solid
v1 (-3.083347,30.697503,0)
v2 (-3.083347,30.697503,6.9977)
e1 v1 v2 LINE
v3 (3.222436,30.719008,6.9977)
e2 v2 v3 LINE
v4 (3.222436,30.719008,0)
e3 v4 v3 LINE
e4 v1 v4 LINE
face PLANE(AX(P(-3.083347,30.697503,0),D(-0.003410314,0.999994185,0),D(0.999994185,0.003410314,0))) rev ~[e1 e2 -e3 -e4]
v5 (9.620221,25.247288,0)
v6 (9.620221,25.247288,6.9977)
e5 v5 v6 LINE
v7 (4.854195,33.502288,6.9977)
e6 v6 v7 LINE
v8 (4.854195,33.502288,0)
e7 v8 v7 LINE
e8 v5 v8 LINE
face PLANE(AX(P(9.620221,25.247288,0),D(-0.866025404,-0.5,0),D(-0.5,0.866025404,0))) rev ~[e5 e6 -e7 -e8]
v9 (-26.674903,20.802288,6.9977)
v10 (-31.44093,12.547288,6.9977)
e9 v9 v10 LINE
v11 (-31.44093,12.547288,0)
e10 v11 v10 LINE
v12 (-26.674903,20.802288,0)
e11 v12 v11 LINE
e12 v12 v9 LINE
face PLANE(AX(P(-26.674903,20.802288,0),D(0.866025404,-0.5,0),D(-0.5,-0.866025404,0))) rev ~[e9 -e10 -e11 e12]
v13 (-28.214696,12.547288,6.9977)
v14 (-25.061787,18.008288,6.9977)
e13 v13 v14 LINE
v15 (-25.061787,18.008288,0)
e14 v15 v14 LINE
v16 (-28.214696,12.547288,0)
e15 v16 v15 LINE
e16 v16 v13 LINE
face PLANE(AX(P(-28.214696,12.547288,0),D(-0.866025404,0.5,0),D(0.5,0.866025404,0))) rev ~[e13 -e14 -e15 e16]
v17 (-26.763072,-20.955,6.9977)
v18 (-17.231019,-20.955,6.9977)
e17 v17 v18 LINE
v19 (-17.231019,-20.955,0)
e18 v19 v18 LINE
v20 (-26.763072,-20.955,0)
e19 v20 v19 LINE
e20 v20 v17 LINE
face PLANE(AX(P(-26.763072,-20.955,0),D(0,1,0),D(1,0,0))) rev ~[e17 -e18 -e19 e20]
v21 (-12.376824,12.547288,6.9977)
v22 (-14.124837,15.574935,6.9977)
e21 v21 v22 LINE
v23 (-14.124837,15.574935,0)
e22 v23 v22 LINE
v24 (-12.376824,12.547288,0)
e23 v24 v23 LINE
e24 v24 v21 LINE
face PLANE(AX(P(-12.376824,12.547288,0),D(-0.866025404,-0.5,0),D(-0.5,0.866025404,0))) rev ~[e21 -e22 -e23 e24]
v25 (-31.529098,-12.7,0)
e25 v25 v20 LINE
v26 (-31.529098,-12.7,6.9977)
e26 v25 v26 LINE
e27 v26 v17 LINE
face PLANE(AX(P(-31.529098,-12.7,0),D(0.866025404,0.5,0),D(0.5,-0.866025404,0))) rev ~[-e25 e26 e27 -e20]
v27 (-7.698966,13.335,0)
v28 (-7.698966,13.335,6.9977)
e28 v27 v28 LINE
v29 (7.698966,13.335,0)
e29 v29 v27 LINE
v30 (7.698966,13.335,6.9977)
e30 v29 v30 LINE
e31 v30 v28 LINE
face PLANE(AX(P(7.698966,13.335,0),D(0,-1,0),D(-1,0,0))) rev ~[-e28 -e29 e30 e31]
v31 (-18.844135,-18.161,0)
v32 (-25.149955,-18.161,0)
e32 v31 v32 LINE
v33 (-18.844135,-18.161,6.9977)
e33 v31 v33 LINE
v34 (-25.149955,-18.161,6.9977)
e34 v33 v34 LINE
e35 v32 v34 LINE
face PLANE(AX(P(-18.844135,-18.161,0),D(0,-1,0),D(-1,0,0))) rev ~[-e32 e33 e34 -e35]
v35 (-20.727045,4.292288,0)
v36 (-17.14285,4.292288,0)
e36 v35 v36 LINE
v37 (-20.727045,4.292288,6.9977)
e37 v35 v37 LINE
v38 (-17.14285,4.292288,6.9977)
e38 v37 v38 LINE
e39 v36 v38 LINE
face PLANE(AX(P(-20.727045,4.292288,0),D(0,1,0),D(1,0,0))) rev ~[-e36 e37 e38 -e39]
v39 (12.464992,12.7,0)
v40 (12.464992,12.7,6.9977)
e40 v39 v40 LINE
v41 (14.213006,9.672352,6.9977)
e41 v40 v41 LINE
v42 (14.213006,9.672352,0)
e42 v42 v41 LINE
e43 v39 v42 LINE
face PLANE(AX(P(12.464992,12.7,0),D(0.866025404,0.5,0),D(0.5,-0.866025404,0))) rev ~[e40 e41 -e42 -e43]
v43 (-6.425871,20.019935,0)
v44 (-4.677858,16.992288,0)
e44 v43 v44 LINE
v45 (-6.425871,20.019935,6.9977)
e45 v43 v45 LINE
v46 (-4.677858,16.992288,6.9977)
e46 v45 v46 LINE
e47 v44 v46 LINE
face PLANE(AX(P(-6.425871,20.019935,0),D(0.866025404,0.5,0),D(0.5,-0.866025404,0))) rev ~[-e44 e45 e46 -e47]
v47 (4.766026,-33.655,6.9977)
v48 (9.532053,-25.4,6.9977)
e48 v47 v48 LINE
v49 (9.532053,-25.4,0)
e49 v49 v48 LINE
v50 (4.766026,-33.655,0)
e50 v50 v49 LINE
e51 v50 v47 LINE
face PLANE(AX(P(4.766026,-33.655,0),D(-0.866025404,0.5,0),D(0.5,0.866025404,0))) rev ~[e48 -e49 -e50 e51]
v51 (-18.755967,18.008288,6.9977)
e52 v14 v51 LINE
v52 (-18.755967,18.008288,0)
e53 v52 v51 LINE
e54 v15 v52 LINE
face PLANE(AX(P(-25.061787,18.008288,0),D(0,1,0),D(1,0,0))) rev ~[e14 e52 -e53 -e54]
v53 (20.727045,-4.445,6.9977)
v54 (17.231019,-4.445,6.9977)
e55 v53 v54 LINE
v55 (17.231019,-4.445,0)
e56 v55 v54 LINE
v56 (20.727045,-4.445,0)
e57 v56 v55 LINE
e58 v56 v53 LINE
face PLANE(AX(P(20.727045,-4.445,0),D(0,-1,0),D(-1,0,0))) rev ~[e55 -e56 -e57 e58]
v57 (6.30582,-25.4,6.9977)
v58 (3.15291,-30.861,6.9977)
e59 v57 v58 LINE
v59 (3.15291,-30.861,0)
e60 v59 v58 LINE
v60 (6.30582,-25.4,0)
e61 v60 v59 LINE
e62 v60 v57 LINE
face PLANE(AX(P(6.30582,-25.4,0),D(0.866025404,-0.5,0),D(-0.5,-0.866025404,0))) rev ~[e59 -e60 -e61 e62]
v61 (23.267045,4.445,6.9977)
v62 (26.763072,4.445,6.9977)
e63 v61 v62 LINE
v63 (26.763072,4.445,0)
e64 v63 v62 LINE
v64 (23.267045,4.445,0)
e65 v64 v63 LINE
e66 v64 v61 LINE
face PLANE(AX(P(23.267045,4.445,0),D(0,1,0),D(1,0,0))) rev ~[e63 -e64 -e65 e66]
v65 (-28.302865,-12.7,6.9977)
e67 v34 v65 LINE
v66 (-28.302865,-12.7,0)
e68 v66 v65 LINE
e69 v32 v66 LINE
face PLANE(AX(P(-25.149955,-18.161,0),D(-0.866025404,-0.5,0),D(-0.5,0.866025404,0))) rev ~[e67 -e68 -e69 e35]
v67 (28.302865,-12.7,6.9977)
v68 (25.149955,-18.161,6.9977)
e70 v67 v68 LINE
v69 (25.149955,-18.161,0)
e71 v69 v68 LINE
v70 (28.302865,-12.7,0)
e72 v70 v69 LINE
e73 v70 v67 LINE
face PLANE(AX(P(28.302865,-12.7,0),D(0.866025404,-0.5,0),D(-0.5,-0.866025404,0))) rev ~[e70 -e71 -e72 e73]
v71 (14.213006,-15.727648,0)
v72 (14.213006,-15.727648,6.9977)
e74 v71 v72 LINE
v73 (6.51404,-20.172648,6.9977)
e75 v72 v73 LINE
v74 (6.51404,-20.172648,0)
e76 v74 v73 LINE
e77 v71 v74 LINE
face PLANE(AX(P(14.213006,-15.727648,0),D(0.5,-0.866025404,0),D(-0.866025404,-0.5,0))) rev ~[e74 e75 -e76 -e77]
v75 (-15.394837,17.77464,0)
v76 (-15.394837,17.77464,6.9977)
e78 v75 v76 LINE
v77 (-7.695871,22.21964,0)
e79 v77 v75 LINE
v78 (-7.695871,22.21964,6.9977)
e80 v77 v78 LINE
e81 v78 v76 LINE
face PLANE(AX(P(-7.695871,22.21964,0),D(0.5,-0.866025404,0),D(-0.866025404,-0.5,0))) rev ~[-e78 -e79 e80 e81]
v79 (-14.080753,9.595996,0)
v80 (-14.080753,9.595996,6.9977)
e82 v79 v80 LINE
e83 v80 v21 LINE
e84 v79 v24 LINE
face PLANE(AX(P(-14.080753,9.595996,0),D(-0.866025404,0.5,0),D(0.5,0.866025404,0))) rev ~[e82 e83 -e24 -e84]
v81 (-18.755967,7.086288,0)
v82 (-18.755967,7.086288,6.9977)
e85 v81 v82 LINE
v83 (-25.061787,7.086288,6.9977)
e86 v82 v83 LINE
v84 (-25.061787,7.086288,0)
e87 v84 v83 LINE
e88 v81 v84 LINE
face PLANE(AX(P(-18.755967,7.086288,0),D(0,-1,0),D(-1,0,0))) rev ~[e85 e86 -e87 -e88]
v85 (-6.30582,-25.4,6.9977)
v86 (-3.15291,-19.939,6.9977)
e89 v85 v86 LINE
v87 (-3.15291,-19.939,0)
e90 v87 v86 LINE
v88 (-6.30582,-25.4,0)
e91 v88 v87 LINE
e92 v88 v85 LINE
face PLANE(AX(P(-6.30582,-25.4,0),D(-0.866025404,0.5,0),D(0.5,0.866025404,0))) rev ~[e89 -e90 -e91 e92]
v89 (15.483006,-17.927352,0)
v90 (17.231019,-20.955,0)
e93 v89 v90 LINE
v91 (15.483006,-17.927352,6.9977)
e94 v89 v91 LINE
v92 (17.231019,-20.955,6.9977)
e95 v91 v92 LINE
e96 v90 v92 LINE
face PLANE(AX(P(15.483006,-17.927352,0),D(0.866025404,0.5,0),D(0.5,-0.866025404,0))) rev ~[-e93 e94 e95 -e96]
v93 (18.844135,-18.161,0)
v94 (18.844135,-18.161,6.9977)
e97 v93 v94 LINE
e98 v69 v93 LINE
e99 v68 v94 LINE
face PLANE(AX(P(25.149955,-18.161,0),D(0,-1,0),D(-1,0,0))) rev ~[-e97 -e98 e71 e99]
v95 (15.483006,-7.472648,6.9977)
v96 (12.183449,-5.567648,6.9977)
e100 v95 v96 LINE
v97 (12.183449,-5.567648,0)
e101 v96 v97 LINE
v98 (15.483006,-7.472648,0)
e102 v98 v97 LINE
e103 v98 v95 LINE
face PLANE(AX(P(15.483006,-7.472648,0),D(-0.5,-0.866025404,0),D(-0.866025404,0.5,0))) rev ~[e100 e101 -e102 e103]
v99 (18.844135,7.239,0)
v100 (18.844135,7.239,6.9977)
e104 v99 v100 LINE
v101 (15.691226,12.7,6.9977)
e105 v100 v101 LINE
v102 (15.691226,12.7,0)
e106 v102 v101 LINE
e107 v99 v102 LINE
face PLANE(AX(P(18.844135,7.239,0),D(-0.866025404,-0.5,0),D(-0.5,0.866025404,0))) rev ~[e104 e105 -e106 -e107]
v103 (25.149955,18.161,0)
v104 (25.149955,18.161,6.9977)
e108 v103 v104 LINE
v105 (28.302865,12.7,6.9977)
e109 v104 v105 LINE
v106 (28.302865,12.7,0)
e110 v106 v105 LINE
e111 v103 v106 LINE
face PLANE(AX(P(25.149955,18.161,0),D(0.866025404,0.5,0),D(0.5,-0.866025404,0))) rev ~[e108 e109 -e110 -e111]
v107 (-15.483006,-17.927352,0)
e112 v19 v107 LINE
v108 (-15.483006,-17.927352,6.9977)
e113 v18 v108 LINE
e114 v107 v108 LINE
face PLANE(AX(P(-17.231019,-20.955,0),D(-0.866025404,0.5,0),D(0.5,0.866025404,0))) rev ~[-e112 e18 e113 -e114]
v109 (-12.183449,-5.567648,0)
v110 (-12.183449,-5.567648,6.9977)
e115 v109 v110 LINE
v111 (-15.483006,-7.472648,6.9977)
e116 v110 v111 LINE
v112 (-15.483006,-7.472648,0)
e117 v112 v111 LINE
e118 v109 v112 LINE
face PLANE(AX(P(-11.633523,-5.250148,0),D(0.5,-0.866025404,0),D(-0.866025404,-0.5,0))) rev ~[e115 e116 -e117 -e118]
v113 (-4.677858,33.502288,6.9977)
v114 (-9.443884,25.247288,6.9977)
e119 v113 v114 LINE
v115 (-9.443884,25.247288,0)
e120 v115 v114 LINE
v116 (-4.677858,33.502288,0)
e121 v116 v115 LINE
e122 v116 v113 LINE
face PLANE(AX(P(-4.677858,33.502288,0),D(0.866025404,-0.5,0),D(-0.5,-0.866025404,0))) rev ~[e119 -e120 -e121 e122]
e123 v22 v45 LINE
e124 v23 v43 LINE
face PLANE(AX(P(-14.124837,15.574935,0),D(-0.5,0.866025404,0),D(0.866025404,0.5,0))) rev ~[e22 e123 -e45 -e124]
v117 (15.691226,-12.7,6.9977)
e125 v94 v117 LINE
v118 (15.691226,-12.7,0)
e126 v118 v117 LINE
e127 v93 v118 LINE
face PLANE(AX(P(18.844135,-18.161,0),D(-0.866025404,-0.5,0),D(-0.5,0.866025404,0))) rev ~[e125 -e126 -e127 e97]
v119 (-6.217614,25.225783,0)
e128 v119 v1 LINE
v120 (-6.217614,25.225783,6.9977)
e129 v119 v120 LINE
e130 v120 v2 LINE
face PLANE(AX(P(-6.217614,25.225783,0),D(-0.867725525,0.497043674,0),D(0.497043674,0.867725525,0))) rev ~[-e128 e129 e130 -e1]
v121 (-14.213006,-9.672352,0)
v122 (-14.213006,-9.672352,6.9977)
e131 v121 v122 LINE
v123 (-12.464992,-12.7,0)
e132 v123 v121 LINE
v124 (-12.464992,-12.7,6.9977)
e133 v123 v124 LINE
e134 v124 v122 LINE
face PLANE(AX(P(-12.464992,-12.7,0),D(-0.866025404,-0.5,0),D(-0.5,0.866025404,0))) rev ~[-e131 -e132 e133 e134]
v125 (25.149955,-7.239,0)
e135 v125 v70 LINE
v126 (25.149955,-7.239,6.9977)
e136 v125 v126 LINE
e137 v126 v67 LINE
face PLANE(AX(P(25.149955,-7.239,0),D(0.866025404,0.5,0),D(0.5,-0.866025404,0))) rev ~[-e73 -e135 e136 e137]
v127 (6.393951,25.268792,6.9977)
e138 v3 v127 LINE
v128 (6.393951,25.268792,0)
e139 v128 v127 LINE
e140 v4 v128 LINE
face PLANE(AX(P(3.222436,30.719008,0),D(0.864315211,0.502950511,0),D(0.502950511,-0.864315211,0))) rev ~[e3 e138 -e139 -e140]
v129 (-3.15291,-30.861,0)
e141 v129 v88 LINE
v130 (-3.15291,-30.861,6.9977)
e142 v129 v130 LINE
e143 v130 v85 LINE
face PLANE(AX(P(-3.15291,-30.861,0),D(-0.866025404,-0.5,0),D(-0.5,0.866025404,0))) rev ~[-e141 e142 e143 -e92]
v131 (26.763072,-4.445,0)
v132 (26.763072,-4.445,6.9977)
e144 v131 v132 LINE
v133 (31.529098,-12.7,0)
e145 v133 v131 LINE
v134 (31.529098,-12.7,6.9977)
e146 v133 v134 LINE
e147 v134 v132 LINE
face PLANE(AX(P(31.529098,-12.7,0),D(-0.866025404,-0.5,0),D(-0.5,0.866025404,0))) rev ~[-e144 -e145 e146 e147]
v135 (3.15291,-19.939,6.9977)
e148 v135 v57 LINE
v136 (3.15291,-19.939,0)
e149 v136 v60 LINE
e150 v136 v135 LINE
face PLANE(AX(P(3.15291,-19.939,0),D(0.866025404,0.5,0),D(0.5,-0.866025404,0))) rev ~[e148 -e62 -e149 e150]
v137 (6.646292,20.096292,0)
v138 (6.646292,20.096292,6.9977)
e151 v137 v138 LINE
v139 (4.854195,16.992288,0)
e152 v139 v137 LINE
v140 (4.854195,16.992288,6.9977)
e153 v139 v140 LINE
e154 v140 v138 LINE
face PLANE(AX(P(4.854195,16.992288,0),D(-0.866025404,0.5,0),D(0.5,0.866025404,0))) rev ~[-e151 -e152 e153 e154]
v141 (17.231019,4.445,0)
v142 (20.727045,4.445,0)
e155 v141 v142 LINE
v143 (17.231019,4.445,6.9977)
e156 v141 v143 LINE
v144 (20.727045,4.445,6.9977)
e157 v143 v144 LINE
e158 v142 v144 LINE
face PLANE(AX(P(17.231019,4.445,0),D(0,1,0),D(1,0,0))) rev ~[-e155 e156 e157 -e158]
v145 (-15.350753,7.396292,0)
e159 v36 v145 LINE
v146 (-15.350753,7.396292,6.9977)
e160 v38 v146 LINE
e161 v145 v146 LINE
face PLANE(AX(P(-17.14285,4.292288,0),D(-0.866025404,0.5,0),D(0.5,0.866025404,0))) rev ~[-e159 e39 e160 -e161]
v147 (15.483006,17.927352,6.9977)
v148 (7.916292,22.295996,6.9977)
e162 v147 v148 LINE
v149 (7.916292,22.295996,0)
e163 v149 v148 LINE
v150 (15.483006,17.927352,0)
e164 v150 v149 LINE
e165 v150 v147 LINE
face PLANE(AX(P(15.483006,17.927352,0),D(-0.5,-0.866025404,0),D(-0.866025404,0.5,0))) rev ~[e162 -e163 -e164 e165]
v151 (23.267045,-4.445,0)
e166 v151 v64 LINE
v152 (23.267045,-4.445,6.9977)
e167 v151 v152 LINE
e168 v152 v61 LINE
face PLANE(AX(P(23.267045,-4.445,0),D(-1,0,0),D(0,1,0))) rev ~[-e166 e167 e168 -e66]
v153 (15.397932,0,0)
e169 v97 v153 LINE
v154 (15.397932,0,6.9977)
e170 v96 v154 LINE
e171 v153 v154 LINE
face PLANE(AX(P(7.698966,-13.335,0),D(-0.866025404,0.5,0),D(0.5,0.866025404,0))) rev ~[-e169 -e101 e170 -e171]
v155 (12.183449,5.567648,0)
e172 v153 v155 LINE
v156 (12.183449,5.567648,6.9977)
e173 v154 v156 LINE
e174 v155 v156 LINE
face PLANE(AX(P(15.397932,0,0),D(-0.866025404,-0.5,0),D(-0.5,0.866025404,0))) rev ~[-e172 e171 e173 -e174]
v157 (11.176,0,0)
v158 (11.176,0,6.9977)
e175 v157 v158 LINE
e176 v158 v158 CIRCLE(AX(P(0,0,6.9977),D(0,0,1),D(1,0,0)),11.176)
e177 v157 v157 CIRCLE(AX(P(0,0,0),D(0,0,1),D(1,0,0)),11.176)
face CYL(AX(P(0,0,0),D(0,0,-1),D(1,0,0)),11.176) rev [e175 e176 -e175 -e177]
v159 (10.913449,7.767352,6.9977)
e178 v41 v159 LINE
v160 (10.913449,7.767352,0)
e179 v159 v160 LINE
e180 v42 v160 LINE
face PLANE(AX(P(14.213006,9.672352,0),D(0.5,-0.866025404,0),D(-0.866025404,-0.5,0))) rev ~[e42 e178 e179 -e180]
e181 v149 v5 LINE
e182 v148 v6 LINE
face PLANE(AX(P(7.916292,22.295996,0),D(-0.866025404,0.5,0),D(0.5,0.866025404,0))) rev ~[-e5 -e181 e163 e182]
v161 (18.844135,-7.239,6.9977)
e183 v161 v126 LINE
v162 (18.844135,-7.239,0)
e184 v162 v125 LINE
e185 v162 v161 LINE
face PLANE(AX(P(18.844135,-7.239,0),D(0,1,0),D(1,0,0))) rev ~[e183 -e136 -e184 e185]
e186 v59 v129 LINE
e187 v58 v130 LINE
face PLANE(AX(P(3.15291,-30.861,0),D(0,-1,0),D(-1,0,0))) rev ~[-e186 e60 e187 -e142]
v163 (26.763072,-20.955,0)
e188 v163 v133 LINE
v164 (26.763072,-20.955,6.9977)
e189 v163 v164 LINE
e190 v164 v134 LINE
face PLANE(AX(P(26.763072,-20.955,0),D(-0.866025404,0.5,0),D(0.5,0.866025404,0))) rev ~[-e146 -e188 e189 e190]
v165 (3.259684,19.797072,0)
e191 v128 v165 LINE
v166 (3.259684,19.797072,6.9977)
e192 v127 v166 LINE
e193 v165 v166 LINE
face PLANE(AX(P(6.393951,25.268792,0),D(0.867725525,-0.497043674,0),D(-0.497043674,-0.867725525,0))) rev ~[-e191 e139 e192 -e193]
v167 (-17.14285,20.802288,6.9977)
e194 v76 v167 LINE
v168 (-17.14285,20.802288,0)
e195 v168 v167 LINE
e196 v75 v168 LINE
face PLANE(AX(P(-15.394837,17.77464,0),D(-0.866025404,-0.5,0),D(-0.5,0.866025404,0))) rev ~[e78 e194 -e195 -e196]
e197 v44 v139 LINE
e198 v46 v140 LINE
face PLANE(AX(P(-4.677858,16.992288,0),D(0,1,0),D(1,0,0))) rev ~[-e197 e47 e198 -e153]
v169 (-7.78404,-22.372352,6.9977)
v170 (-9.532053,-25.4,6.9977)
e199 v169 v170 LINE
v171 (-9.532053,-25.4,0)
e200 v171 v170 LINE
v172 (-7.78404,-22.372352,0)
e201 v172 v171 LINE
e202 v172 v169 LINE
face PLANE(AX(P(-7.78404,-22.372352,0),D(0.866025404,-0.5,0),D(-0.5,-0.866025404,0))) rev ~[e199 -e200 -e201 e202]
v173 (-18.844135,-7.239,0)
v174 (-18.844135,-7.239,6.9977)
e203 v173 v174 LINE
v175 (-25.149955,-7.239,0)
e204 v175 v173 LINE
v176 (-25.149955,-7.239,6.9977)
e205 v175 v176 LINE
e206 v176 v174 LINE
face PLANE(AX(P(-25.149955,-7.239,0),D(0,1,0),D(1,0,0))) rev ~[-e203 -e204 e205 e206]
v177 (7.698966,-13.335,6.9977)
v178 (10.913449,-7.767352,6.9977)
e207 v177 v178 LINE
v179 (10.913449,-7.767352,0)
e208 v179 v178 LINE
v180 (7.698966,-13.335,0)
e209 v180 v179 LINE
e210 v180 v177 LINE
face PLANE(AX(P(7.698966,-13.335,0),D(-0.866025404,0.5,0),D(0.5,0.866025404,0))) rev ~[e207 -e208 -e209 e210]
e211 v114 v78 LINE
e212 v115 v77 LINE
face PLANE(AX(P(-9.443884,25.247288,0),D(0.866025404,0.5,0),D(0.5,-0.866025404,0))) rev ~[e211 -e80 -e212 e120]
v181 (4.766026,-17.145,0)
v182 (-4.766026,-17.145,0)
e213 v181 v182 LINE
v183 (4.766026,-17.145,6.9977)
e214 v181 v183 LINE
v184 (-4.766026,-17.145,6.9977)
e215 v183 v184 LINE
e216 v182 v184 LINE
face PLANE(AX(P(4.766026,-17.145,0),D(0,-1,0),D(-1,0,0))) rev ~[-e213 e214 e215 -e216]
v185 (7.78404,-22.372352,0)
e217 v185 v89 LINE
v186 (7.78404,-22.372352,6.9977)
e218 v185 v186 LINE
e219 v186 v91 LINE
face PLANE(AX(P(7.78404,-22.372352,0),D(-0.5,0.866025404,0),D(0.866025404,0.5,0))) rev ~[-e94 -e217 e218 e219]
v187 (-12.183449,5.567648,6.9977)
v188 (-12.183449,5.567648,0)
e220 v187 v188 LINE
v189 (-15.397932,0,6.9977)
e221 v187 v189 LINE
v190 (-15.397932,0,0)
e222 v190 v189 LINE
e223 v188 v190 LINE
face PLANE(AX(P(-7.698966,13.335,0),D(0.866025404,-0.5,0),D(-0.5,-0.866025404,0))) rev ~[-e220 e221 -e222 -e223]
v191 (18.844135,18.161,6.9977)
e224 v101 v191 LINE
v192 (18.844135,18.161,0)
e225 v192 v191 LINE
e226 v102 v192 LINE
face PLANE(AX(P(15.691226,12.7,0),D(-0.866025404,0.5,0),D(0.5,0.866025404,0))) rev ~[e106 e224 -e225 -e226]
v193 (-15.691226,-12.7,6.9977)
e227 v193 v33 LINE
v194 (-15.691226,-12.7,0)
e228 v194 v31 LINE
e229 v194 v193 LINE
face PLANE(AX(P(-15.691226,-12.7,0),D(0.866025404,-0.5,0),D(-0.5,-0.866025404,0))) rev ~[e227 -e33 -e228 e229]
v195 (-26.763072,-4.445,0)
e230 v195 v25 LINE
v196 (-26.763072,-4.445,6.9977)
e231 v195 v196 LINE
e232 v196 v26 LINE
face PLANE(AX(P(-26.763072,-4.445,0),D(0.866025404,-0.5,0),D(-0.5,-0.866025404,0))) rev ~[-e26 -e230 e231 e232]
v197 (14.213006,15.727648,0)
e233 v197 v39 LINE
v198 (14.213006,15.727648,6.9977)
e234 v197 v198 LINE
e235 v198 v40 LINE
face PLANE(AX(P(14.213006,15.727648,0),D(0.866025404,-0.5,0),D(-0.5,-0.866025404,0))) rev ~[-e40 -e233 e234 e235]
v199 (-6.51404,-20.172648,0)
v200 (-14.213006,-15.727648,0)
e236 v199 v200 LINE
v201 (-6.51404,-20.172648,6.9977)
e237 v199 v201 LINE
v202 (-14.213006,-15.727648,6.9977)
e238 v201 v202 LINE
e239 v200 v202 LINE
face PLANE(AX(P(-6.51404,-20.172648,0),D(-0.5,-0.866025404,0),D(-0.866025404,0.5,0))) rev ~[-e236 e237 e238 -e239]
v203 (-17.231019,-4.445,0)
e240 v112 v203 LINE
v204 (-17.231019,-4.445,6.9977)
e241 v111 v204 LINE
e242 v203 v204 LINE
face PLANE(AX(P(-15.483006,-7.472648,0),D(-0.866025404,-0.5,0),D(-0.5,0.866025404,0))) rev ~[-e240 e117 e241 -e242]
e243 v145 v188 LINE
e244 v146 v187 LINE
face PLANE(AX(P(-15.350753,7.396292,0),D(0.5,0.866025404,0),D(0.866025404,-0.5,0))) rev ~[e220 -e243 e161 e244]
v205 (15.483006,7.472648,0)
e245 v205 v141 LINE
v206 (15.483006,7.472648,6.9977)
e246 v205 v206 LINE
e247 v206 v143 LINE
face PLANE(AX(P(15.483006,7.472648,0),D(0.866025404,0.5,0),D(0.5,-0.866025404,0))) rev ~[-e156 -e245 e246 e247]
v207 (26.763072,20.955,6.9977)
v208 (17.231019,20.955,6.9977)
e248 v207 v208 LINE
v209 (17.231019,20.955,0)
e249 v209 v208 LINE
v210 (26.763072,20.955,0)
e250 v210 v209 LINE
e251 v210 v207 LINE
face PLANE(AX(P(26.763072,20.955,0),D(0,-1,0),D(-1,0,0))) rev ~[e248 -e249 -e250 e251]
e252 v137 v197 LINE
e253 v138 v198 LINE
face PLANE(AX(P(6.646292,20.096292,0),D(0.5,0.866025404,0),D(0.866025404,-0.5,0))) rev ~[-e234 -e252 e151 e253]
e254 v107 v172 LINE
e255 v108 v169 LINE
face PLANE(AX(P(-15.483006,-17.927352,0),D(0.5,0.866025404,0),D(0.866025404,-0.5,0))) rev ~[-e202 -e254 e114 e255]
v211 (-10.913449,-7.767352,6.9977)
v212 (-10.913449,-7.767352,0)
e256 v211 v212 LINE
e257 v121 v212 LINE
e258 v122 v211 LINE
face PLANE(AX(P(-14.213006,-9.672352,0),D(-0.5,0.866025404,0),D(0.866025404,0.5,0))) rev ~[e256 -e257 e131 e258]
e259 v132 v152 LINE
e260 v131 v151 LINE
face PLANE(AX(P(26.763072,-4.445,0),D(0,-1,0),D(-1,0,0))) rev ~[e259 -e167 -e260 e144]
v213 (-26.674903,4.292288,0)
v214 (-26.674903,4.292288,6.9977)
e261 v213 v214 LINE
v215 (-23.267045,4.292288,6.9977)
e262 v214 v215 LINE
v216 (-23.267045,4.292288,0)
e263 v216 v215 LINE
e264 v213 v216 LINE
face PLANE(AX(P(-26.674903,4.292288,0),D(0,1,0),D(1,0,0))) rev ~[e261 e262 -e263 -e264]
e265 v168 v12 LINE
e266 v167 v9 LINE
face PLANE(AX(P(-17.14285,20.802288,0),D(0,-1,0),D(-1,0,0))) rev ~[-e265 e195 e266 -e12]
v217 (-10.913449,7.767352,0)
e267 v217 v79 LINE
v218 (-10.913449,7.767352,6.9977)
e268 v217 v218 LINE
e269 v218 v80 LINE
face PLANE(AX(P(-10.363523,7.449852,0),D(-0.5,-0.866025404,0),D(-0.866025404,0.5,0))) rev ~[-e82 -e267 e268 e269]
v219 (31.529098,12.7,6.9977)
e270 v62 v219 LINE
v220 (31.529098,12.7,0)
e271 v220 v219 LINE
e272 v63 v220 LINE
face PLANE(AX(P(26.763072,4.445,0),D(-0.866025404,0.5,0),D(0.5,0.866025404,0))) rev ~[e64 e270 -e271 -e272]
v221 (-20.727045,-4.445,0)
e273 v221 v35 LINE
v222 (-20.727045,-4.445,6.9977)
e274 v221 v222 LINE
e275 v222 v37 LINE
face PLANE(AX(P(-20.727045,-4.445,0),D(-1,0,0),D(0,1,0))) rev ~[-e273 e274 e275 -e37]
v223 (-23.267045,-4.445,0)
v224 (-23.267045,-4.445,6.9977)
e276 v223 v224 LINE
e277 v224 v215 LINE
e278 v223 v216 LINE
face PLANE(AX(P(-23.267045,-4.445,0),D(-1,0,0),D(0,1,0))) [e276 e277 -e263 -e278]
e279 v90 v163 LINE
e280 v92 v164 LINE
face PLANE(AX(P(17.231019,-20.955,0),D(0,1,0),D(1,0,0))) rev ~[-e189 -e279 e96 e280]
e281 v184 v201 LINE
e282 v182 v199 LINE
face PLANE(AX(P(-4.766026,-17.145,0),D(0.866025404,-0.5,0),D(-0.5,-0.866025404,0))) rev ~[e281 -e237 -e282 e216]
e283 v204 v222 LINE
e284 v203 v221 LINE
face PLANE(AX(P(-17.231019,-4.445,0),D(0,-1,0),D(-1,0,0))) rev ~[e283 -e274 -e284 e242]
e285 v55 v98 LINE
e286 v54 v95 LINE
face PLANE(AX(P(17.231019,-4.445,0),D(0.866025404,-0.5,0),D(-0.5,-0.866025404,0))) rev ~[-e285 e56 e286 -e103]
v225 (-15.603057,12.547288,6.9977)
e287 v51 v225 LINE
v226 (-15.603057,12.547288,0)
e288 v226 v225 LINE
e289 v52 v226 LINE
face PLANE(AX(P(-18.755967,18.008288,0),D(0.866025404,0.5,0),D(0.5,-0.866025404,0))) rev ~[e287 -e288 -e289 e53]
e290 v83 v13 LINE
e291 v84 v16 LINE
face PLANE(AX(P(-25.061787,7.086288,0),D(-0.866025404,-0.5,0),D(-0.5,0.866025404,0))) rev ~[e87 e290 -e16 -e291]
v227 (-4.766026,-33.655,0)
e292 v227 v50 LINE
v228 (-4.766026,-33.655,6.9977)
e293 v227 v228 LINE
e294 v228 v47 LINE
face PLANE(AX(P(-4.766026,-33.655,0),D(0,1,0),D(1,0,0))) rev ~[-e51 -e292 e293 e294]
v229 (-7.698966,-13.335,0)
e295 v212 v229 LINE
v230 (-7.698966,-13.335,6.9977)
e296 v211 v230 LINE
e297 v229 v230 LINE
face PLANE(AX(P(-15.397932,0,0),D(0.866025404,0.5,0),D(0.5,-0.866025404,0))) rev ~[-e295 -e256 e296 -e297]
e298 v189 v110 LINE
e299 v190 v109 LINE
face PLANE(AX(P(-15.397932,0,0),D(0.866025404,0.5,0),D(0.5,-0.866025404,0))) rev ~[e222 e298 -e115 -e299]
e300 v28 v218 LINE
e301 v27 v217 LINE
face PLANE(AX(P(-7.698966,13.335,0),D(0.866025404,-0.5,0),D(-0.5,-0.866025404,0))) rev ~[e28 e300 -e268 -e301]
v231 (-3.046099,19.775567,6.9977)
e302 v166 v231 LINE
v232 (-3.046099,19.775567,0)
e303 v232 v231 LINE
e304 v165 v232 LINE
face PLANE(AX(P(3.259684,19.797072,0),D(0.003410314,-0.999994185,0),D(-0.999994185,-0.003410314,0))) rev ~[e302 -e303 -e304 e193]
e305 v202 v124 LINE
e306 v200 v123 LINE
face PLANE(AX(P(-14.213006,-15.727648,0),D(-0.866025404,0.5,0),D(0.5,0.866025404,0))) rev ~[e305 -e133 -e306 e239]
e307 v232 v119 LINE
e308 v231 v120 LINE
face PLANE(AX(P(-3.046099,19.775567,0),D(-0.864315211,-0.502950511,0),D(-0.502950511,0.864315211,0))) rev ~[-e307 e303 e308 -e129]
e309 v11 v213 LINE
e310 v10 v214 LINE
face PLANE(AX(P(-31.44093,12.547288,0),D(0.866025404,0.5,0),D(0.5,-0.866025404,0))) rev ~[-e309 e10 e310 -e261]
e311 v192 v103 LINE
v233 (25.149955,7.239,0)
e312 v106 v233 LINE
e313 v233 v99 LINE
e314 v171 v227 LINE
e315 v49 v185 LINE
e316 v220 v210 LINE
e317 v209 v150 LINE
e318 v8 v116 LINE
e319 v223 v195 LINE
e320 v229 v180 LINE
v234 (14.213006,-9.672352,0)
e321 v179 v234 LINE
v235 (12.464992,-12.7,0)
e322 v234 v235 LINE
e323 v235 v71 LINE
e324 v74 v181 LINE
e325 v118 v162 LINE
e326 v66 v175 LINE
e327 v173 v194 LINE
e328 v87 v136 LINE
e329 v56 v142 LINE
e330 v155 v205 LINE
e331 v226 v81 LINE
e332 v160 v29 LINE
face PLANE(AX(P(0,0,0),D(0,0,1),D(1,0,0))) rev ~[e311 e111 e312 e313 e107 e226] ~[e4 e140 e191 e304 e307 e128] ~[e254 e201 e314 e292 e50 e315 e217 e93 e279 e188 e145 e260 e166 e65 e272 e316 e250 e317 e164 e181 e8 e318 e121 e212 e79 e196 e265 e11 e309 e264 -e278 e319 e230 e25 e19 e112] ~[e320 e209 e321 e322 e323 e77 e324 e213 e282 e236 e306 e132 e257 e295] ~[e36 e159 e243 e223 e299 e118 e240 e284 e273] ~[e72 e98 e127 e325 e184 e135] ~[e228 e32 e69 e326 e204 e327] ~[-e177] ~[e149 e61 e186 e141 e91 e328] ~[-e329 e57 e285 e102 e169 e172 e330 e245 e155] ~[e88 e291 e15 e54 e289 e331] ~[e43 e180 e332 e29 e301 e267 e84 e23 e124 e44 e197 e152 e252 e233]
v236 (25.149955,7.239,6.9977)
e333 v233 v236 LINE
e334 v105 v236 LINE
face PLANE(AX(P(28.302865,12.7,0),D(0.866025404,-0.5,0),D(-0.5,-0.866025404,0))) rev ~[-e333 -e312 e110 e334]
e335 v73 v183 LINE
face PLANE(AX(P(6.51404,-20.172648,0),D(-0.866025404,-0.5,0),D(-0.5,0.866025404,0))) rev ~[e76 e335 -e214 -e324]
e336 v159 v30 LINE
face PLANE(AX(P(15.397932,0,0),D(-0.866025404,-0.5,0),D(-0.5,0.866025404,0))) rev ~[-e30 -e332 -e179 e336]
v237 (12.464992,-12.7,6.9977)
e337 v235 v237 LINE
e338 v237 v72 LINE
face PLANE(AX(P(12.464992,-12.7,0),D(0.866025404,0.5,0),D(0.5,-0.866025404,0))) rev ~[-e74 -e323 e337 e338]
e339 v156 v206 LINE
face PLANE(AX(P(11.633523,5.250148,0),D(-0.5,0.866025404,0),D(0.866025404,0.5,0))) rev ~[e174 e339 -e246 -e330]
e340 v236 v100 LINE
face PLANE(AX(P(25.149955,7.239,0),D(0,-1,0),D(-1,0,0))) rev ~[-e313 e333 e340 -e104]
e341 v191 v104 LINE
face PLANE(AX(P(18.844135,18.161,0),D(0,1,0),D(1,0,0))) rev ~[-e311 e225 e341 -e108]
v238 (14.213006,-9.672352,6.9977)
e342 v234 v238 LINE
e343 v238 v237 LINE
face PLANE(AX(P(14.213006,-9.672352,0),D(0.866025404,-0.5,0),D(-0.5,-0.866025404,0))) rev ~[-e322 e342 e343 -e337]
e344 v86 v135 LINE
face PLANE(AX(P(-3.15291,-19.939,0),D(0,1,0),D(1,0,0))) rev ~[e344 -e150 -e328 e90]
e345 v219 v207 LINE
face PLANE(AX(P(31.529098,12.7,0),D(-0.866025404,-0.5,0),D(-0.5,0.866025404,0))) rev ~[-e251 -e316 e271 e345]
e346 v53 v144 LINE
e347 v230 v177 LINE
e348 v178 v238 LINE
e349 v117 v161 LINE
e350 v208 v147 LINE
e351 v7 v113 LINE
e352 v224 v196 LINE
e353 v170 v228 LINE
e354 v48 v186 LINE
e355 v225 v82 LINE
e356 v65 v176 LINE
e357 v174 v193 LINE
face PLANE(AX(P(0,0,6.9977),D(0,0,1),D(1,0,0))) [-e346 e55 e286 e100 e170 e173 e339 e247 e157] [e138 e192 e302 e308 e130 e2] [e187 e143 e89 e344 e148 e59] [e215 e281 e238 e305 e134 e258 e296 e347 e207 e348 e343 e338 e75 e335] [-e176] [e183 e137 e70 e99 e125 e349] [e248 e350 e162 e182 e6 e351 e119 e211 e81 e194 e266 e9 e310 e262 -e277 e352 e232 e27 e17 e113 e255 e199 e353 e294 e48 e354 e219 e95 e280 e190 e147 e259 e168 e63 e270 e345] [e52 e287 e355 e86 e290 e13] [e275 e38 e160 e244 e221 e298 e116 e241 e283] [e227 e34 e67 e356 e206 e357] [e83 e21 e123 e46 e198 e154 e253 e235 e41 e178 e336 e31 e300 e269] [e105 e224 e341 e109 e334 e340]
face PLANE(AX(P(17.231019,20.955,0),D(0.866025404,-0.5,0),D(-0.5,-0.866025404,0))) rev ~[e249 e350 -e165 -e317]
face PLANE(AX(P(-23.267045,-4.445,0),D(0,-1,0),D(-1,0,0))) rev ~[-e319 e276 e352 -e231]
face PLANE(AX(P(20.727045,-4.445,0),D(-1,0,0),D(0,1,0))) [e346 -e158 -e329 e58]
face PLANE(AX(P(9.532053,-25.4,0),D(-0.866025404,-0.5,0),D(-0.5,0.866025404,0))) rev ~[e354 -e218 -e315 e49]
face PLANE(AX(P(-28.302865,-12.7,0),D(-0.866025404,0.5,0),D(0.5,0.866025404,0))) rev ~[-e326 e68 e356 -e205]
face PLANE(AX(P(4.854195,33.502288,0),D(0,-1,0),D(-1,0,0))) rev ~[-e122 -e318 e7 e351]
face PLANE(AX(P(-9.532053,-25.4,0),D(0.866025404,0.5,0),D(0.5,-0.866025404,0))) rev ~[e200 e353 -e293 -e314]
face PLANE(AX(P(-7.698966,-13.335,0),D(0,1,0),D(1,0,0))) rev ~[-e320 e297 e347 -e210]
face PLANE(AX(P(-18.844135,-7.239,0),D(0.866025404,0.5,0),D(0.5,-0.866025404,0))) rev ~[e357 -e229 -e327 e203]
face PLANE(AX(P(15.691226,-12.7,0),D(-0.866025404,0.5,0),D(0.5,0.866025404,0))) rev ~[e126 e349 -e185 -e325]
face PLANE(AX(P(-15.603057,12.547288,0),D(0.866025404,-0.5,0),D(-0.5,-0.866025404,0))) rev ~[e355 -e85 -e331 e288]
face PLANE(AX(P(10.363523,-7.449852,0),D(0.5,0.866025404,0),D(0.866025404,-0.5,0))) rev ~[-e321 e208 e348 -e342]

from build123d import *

# Parameters (mm, degrees)
F0_W     = 2.54
F0_H     = 8.7372876405
F0_H_2   = 8.89
F1_DEPTH = 6.9977
F2_R     = 11.176
F3_DEPTH = 6.9977


with BuildPart() as f1:
    # F0 (on Top) → F1 (new body)
    with BuildSketch(Plane.XY):
        Polygon((-11.6335226281, 5.2501477372), (-10.3635226281, 7.4498522628), (-14.0807527651, 9.595996083), (-15.3507527651, 7.3962915574), align=None)
        Polygon((-15.3507527651, 7.3962915574), (-14.0807527651, 9.595996083), (-12.3768237899, 12.5472876405), (-14.124837026, 15.5749353777), (-14.2130055479, 15.7276477372), (-15.394837026, 17.7746399033), (-17.1428502621, 20.8022876405), (-26.6749032064, 20.8022876405), (-31.4409296786, 12.5472876405), (-26.6749032064, 4.2922876405), (-23.2670452561, 4.2922876405), (-20.7270452561, 4.2922876405), (-17.1428502621, 4.2922876405), align=None)
        Polygon((-18.7559669142, 18.0082876405), (-15.6030570942, 12.5472876405), (-18.7559669142, 7.0862876405), (-25.0617865543, 7.0862876405), (-28.2146963743, 12.5472876405), (-25.0617865543, 18.0082876405), align=None, mode=Mode.SUBTRACT)
        Polygon((14.2130055479, 9.6723522628), (10.3635226281, 7.4498522628), (11.6335226281, 5.2501477372), (15.4830055479, 7.4726477372), align=None)
        Polygon((-10.3635226281, -7.4498522628), (-11.6335226281, -5.2501477372), (-15.4830055479, -7.4726477372), (-14.2130055479, -9.6723522628), align=None)
        Polygon((-14.2130055479, 15.7276477372), (-14.124837026, 15.5749353777), (-6.4258711864, 20.0199353777), (-7.6958711864, 22.2196399033), (-15.394837026, 17.7746399033), align=None)
        Polygon((12.4649923118, 12.7), (14.2130055479, 9.6723522628), (15.4830055479, 7.4726477372), (17.231018784, 4.445), (20.7270452561, 4.445), (23.2670452561, 4.445), (26.7630717283, 4.445), (31.5290982004, 12.7), (26.7630717283, 20.955), (17.231018784, 20.955), (15.4830055479, 17.9273522628), (14.2130055479, 15.7276477372), align=None)
        Polygon((25.1499550762, 7.239), (18.8441354361, 7.239), (15.691225616, 12.7), (18.8441354361, 18.161), (25.1499550762, 18.161), (28.3028648962, 12.7), align=None, mode=Mode.SUBTRACT)
        Polygon((-14.2130055479, -9.6723522628), (-15.4830055479, -7.4726477372), (-17.231018784, -4.445), (-20.7270452561, -4.445), (-23.2670452561, -4.445), (-26.7630717283, -4.445), (-31.5290982004, -12.7), (-26.7630717283, -20.955), (-17.231018784, -20.955), (-15.4830055479, -17.9273522628), (-14.2130055479, -15.7276477372), (-12.4649923118, -12.7), align=None)
        Polygon((-25.1499550762, -7.239), (-18.8441354361, -7.239), (-15.691225616, -12.7), (-18.8441354361, -18.161), (-25.1499550762, -18.161), (-28.3028648962, -12.7), align=None, mode=Mode.SUBTRACT)
        with Locations((-21.9970452561, -0.0763561798)):
            Rectangle(F0_W, F0_H)
        Polygon((-7.6958711864, 22.2196399033), (-6.4258711864, 20.0199353777), (-4.6778579503, 16.9922876405), (-1.27, 16.9922876405), (1.27, 16.9922876405), (4.854194994, 16.9922876405), (6.6462924911, 20.0962915574), (7.9162924911, 22.295996083), (9.6202214662, 25.2472876405), (4.854194994, 33.5022876405), (-4.6778579503, 33.5022876405), (-9.4438844224, 25.2472876405), align=None)
        Polygon((6.3939514928, 25.2687924658), (3.2596837324, 19.7970718096), (-3.0460992385, 19.7755669843), (-6.217614449, 25.2257828151), (-3.0833466886, 30.6975034713), (3.2224362823, 30.7190082967), align=None, mode=Mode.SUBTRACT)
        Polygon((15.4830055479, -7.4726477372), (11.6335226281, -5.2501477372), (10.3635226281, -7.4498522628), (14.2130055479, -9.6723522628), align=None)
        Polygon((6.6462924911, 20.0962915574), (14.2130055479, 15.7276477372), (15.4830055479, 17.9273522628), (7.9162924911, 22.295996083), align=None)
        Polygon((17.231018784, -4.445), (15.4830055479, -7.4726477372), (14.2130055479, -9.6723522628), (12.4649923118, -12.7), (14.2130055479, -15.7276477372), (15.4830055479, -17.9273522628), (17.231018784, -20.955), (26.7630717283, -20.955), (31.5290982004, -12.7), (26.7630717283, -4.445), (23.2670452561, -4.445), (20.7270452561, -4.445), align=None)
        Polygon((18.8441354361, -18.161), (15.691225616, -12.7), (18.8441354361, -7.239), (25.1499550762, -7.239), (28.3028648962, -12.7), (25.1499550762, -18.161), align=None, mode=Mode.SUBTRACT)
        with Locations((21.9970452561, 0)):
            Rectangle(F0_W, F0_H_2)
        Polygon((-6.5140397082, -20.1726477372), (-14.2130055479, -15.7276477372), (-15.4830055479, -17.9273522628), (-7.7840397082, -22.3723522628), align=None)
        Polygon((-4.7660264722, -17.145), (-6.5140397082, -20.1726477372), (-7.7840397082, -22.3723522628), (-9.5320529443, -25.4), (-4.7660264722, -33.655), (4.7660264722, -33.655), (9.5320529443, -25.4), (7.7840397082, -22.3723522628), (6.5140397082, -20.1726477372), (4.7660264722, -17.145), (1.27, -17.145), (-1.27, -17.145), align=None)
        Polygon((-6.3058196401, -25.4), (-3.15290982, -19.939), (3.15290982, -19.939), (6.3058196401, -25.4), (3.15290982, -30.861), (-3.15290982, -30.861), align=None, mode=Mode.SUBTRACT)
        Polygon((15.4830055479, -17.9273522628), (14.2130055479, -15.7276477372), (6.5140397082, -20.1726477372), (7.7840397082, -22.3723522628), align=None)
    extrude(amount=F1_DEPTH)

    # F2 (on Top) → F3 (join)
    with BuildSketch(Plane.XY):
        Polygon((7.6989658396, 13.335), (-7.6989658396, 13.335), (-15.3979316793, 0), (-7.6989658396, -13.335), (7.6989658396, -13.335), (15.3979316793, 0), align=None)
        Circle(F2_R, mode=Mode.SUBTRACT)
    extrude(amount=F3_DEPTH)


solid = f1.part
